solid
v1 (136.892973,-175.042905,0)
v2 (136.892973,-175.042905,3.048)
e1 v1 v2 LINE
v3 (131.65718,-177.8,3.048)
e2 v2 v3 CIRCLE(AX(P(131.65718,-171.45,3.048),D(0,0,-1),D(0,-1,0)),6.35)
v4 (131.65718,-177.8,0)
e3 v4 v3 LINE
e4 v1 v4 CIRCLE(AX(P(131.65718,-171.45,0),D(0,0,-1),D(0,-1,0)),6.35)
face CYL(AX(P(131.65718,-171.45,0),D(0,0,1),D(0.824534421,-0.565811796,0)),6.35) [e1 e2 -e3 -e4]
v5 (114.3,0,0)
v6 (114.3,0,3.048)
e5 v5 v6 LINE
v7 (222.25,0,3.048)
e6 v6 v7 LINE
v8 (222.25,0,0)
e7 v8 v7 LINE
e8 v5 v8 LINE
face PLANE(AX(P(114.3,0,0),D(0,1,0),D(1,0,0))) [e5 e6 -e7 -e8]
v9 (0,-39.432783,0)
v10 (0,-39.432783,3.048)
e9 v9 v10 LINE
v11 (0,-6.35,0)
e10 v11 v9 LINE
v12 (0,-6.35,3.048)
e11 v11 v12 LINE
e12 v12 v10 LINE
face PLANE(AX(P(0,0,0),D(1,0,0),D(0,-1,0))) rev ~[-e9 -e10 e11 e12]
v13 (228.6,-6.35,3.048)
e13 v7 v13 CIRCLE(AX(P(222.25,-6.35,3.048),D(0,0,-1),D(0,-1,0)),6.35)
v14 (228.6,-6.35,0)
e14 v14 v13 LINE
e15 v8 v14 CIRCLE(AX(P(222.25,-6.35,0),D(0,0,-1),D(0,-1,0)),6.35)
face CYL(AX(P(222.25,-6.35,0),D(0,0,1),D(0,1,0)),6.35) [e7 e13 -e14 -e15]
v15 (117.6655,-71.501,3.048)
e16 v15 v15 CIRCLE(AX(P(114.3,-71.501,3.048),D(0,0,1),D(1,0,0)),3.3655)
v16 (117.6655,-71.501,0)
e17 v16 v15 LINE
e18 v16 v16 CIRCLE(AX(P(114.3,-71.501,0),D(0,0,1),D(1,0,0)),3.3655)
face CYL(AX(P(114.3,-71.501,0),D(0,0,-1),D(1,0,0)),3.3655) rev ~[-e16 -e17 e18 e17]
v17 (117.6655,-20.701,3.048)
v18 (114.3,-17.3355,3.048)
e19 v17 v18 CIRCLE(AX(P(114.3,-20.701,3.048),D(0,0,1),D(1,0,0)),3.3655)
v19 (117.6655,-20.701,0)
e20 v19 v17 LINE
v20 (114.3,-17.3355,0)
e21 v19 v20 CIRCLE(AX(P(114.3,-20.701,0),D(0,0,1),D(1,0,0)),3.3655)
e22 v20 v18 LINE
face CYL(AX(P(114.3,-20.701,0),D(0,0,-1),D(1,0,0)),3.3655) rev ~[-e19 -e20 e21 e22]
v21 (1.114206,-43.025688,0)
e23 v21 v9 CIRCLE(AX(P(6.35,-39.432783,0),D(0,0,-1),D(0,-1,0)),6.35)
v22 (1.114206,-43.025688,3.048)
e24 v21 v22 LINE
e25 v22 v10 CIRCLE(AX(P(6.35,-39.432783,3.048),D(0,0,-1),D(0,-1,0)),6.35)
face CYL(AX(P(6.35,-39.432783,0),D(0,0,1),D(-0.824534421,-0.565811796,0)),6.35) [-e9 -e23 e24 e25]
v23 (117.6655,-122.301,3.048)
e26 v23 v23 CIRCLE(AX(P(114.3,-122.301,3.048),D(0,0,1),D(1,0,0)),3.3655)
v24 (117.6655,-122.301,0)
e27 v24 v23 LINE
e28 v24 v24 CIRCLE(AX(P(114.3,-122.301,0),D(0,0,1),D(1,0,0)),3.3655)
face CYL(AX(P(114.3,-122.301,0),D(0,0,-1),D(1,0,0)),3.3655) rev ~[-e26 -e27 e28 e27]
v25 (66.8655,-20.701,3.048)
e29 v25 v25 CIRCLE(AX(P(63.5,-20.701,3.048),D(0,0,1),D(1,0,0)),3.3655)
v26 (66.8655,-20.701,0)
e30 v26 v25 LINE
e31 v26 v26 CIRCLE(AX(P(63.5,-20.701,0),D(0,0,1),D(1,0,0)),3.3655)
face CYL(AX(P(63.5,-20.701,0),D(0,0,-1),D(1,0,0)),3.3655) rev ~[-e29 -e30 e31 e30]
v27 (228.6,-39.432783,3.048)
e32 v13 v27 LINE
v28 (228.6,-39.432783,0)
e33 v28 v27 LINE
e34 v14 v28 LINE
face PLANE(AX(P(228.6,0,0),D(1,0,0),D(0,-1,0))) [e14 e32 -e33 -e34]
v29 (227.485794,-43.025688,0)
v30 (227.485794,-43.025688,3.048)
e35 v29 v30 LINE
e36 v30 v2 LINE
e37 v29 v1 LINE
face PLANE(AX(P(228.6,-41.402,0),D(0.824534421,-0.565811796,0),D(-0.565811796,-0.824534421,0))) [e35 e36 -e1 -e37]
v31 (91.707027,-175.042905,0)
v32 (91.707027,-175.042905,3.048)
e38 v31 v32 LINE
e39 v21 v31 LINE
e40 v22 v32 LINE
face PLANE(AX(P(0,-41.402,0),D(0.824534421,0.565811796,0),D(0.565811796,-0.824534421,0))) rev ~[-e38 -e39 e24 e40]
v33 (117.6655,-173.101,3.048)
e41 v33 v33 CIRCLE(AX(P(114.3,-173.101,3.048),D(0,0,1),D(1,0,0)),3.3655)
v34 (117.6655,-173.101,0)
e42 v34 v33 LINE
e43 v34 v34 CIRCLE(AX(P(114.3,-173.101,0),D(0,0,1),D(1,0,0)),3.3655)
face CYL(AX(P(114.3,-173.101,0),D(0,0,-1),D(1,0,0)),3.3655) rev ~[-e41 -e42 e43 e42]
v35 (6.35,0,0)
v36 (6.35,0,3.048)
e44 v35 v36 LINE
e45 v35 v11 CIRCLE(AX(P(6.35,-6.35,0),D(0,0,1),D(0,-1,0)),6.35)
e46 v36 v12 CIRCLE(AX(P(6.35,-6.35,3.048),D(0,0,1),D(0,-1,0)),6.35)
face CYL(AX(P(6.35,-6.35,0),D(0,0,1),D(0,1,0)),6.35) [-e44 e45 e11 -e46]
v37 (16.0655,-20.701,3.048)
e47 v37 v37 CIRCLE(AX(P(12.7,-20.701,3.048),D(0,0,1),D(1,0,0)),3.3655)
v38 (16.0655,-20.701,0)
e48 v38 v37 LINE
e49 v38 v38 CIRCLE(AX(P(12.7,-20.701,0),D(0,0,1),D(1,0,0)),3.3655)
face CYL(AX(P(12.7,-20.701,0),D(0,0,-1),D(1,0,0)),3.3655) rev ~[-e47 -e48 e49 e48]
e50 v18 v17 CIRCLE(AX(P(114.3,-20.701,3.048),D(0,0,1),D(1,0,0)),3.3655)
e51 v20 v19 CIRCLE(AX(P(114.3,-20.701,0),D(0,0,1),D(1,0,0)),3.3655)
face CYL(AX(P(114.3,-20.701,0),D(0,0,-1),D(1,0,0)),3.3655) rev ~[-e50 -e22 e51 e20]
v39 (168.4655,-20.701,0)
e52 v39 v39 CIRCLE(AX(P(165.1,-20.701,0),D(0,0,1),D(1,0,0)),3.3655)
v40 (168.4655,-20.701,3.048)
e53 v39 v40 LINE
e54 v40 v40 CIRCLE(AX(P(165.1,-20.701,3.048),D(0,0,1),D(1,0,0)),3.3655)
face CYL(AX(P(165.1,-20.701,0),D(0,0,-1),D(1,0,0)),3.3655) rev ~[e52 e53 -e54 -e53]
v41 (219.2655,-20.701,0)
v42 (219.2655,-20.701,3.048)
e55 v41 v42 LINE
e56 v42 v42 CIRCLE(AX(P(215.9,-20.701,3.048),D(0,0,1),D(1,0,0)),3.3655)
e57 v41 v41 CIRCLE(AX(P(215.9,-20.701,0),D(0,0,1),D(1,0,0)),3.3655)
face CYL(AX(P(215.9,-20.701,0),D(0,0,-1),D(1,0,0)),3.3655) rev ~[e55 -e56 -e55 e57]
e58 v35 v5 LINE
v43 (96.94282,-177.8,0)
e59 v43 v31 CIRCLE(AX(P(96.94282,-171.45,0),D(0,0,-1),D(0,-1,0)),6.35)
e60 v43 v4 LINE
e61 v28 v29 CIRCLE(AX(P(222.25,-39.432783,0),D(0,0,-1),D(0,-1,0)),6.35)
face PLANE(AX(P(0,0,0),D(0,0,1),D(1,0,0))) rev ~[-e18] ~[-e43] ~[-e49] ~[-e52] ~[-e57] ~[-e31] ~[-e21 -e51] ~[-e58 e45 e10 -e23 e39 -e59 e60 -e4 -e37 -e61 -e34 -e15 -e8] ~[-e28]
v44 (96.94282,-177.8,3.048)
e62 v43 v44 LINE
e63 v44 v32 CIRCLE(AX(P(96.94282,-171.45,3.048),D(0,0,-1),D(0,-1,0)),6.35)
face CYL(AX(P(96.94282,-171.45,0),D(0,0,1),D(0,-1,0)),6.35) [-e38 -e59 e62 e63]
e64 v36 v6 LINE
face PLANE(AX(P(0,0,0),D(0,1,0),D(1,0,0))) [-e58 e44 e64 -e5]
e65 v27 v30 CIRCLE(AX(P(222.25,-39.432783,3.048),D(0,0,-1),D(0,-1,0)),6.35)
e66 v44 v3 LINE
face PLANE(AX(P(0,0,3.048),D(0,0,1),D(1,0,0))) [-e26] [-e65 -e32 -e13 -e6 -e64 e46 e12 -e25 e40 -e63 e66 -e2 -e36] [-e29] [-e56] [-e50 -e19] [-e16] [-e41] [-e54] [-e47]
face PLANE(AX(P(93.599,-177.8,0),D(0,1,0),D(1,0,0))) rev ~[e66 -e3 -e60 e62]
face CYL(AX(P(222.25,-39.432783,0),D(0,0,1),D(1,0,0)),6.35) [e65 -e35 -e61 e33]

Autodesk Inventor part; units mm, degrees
ref_plane "YZ Plane" through (0, 0, 0) normal (1, 0, 0) x (0, 1, 0)
ref_plane "XZ Plane" through (0, 0, 0) normal (0, 1, 0) x (-1, 0, 0)
ref_plane "XY Plane" through (0, 0, 0) normal (0, 0, 1) x (1, 0, 0)
sketch "Sketch1" plane through (0, 0, 0) normal (0, 0, 1) x (1, 0, 0)
  line L0 (0, 0) -> (228.6, 0)
  line L1 (0, 0) -> (0, -41.402)
  line L2 (228.6, 0) -> (228.6, -41.402)
  line L3 (93.599, -177.8) -> (135.001, -177.8)
  line L4 (0, -41.402) -> (93.599, -177.8)
  line L5 (228.6, -41.402) -> (135.001, -177.8)
  circle A0 centre (215.9, -20.701) radius 3.3655
  circle A1 centre (165.1, -20.701) radius 3.3655
  circle A2 centre (114.3, -20.701) radius 3.3655
  circle A3 centre (63.5, -20.701) radius 3.3655
  circle A4 centre (12.7, -20.701) radius 3.3655
  line L6 (114.3, 0) -> (114.3, -20.701)
  circle A5 centre (114.3, -71.501) radius 3.3655
  circle A6 centre (114.3, -122.301) radius 3.3655
  circle A7 centre (114.3, -173.101) radius 3.3655
  dimension "d0" = 228.6
  dimension "d6" = 41.402
  dimension "d7" = 41.402
  dimension "d8" = 41.402
  dimension "d9" = 177.8
  dimension "d11" = 93.599
  dimension "d13" = 6.731
  dimension "d14" = 12.7
  dimension "d15" = 20.701
  dimension "d18" = 50.8
  dimension "d25" = 50.8
extrude "Plate1" add sketch "Sketch1" along normal blind 3.048
fillet "Corner Round1" radius 6.35 6 edges at (0, 0, 1.524) (0, -41.402, 1.524) (228.6, 0, 1.524) (228.6, -41.402, 1.524) (135.001, -177.8, 1.524) (93.599, -177.8, 1.524)
equation "\"d15\" = 0.5 * d6"
equation "\"BendRadius\" = Thickness"
equation "\"BendReliefWidth\" = Thickness"
equation "\"BendReliefDepth\" = 0.5 * Thickness"
equation "\"CornerReliefSize\" = 4 * Thickness"
equation "\"MinimumRemnant\" = 2 * Thickness"
equation "\"TransitionRadius\" = BendRadius"
equation "\"JacobiRadiusSize\" = BendRadius"
equation "\"GapSize\" = Thickness"
equation "\"d30\" = BendRadius"
equation "\"Thickness\" = 3.048"
properties part number "super4"
